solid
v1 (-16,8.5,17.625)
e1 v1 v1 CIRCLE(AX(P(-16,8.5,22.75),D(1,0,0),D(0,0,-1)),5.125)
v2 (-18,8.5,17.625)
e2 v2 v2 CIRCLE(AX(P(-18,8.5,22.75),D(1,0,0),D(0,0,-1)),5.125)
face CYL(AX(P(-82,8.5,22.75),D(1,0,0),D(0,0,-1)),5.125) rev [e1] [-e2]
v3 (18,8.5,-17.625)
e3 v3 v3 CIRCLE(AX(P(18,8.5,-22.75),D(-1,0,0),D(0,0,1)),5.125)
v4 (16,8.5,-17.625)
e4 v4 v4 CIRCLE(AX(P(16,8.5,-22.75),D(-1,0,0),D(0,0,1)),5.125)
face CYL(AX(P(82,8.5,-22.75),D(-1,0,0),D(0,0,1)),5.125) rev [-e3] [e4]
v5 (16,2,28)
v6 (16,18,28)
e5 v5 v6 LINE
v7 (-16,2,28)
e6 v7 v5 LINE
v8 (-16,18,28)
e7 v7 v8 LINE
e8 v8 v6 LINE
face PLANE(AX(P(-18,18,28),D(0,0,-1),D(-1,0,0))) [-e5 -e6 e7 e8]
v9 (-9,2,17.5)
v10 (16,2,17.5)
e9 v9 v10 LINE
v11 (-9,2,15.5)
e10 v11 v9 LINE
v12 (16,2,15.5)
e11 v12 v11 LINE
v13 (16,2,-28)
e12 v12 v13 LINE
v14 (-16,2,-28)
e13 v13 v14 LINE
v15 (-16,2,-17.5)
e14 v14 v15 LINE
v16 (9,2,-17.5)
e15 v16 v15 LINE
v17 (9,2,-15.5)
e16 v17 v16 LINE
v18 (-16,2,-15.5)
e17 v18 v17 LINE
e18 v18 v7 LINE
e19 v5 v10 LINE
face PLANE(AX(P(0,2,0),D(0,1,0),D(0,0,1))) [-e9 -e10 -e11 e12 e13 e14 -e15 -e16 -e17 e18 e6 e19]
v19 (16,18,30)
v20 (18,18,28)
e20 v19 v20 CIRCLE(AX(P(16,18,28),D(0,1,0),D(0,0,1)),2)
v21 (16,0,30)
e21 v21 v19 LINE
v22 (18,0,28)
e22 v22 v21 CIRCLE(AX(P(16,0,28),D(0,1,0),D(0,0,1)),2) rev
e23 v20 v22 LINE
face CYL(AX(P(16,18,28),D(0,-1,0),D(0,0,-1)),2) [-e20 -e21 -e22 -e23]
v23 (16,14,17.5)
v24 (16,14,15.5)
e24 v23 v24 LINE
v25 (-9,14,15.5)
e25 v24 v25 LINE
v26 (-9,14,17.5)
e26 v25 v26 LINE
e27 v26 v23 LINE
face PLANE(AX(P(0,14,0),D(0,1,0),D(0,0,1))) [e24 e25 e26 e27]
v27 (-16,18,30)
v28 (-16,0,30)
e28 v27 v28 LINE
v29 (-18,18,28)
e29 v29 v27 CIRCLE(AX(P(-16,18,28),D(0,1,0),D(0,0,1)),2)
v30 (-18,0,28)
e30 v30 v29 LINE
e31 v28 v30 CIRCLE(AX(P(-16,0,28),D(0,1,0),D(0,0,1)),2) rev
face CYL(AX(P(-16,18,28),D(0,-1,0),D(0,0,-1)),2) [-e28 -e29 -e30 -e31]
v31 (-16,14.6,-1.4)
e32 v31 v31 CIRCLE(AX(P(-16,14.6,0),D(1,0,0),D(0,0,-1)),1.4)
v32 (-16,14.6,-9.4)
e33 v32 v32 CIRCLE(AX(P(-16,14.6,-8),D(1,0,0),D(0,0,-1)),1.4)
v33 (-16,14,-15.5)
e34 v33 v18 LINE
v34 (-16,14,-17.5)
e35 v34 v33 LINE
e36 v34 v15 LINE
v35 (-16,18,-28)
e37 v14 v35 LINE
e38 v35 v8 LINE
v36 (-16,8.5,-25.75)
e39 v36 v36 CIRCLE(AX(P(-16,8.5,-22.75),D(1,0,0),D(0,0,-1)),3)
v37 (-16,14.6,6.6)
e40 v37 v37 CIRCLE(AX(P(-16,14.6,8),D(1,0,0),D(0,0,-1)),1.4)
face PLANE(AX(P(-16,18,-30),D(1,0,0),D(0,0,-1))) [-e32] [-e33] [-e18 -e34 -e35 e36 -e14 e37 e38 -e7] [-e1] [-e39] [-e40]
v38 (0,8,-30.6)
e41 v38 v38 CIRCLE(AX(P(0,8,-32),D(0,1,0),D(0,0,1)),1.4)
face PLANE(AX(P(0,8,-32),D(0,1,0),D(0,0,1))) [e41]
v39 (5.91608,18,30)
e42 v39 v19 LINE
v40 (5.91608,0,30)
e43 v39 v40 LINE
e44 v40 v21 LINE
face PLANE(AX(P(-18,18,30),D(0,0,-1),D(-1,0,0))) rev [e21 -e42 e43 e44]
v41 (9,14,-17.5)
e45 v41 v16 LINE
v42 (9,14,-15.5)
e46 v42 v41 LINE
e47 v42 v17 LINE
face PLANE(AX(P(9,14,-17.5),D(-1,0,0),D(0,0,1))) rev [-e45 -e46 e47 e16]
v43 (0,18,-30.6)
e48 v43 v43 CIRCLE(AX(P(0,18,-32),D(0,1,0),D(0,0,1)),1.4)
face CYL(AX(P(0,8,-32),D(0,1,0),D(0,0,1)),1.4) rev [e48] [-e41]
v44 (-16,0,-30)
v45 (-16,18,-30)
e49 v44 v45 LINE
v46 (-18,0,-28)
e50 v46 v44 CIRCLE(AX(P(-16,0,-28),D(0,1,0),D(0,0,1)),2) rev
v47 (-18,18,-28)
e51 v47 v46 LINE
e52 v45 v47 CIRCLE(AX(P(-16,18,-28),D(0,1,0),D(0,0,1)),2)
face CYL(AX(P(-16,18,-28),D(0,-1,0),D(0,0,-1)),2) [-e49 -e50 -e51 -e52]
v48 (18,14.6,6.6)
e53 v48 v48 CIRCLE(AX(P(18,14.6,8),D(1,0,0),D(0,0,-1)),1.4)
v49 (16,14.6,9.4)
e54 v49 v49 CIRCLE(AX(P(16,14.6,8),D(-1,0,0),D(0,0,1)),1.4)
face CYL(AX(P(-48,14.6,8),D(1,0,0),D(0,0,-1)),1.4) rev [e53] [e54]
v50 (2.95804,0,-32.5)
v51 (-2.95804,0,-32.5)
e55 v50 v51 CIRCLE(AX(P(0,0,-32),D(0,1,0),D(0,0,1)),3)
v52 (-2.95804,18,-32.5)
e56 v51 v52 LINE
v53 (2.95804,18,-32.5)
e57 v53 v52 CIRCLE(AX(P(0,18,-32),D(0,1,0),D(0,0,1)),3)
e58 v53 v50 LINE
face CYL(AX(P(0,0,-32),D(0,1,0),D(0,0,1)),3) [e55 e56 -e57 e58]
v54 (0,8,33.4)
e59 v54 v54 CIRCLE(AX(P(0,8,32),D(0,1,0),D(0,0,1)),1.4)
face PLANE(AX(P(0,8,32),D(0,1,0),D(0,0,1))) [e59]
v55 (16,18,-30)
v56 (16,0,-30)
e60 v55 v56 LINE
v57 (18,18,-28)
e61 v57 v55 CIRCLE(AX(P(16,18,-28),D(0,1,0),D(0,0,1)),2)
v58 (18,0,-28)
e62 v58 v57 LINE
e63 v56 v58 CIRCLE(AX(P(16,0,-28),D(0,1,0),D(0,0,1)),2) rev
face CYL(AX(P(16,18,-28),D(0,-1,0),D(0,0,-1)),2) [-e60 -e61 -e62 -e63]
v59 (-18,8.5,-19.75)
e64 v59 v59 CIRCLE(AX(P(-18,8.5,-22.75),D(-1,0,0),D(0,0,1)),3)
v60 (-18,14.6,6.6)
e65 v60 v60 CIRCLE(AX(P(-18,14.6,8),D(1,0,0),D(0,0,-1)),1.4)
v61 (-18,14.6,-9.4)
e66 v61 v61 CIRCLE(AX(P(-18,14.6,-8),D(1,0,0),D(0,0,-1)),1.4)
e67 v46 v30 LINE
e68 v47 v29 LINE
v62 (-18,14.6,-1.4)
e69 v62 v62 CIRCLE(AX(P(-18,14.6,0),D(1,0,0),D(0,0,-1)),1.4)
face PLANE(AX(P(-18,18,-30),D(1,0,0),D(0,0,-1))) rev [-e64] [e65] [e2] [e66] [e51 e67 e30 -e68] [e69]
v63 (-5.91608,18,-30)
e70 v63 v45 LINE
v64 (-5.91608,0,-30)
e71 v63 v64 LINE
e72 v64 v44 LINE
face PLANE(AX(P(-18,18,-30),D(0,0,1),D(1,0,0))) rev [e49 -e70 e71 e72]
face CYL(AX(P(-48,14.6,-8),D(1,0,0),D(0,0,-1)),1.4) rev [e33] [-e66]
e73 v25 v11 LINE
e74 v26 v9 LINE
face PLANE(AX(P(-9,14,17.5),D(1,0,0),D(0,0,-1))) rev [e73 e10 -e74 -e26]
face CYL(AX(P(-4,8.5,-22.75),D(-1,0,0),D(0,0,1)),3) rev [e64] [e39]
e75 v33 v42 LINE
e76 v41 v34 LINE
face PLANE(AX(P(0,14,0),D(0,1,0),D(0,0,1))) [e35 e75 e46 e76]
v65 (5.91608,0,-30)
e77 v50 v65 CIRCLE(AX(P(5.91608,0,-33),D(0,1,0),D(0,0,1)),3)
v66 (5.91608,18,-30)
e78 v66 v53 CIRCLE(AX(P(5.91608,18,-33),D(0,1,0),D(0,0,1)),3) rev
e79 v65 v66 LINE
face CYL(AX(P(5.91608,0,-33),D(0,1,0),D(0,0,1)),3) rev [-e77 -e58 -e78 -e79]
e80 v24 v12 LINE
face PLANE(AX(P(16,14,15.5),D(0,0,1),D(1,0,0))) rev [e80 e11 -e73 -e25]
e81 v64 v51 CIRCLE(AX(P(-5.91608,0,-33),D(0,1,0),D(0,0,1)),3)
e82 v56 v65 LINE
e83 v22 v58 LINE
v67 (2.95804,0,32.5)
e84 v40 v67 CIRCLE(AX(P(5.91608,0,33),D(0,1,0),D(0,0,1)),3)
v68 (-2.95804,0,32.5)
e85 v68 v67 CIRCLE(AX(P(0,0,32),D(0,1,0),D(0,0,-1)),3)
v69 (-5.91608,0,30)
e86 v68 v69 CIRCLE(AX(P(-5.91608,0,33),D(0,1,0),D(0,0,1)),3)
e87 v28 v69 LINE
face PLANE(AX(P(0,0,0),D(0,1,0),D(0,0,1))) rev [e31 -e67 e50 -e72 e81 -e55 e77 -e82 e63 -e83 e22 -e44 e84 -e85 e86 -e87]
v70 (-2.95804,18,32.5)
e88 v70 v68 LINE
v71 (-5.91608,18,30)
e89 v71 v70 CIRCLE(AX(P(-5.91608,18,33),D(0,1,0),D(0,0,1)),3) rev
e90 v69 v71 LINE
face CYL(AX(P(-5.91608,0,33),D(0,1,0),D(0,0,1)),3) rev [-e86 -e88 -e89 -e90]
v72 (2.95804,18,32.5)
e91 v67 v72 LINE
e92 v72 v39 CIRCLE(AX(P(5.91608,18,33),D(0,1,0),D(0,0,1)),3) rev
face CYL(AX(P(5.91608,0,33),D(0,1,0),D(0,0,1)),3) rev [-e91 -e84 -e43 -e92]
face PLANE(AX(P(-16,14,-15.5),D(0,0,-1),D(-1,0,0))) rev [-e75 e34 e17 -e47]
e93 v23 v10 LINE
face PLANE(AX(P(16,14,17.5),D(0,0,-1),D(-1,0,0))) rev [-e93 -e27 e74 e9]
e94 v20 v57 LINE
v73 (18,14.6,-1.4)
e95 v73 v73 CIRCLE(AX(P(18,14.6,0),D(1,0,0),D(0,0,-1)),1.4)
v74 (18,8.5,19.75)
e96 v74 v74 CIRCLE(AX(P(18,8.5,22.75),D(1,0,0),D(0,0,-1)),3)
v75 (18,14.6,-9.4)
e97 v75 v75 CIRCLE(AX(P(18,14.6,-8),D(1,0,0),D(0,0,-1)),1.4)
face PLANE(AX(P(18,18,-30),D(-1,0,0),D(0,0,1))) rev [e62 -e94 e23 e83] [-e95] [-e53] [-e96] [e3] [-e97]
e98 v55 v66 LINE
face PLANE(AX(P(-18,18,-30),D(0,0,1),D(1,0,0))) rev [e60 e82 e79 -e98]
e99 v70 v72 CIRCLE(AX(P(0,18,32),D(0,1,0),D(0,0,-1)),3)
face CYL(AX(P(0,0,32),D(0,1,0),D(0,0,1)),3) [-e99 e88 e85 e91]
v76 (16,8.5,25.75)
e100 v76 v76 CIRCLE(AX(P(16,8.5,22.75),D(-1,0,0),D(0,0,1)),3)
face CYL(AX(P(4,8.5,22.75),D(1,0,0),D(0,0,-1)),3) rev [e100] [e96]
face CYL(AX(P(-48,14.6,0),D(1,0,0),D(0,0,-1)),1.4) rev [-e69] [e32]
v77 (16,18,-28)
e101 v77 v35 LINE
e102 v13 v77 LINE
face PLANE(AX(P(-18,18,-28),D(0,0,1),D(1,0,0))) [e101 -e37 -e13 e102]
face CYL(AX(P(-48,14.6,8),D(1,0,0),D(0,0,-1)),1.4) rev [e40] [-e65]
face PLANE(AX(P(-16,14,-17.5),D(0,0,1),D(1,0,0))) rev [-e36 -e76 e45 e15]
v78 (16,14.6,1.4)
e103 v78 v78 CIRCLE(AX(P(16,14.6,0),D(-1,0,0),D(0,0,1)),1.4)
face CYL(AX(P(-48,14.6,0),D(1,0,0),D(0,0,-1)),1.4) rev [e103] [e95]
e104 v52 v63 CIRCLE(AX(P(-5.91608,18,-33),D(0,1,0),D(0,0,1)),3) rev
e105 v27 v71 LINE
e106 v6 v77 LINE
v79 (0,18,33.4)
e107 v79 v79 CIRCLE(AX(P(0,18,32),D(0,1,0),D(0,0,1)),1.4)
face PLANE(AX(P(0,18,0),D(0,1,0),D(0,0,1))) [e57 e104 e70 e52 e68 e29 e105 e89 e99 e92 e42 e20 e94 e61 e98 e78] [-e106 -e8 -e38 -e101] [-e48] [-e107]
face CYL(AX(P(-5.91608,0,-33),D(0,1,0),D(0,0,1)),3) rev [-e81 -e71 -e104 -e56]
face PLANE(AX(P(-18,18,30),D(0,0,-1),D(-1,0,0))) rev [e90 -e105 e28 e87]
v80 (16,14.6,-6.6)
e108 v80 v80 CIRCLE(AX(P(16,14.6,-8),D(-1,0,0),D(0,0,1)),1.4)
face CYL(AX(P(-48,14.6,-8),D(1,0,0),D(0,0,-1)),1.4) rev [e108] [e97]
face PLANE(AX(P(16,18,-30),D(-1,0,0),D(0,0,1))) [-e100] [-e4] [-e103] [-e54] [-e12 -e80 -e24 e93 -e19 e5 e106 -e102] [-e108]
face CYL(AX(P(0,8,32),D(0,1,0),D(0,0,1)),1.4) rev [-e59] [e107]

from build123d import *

# Parameters (mm, degrees)
SKETCH_1_W          = 36
SKETCH_1_H          = 60
EXTRUDE_1_DEPTH     = 18
FILLET_1_R          = 2
SHELL_START         = -16
SHELL_1_OUTLINE_W   = 16
SHELL_1_OUTLINE_H   = 56
SHELL_1_DEPTH       = 32
SKETCH_2_W          = 25
SKETCH_2_H          = 2
EXTRUDE_2_DEPTH     = 12
SKETCH_3_R          = 3
CUT_EXTRUDE_1_DEPTH = 14
SKETCH_4_R          = 3
EXTRUDE_3_DEPTH     = 18
FILLET_2_R          = 3
SKETCH_6_W          = 25
SKETCH_6_H          = 2
EXTRUDE_4_DEPTH     = 12
SKETCH_8_R          = 3
CUT_EXTRUDE_2_DEPTH = 14
SKETCH_9_R          = 1.4
CUT_EXTRUDE_3_DEPTH = 10
SKETCH_11_R         = 1.4
CUT_EXTRUDE_5_DEPTH = 66
SKETCH_13_R         = 5.125
CUT_EXTRUDE_6_DEPTH = 66
SKETCH_14_R         = 5.125
CUT_EXTRUDE_7_DEPTH = 66


# Read off the part's stored shape, not the designer's step: 抽壳1
with BuildPart() as part:
    # 草图1 → 凸台-拉伸1 (new body)
    with BuildSketch(Plane(origin=(0, 0, 0), x_dir=(1, 0, 0), z_dir=(0, 1, 0))):
        Rectangle(SKETCH_1_W, SKETCH_1_H)
    extrude(amount=EXTRUDE_1_DEPTH)

    # 圆角1
    fillet_1_edges = [part.edges().sort_by_distance(p)[0] for p in [
        (-18, 9, -30),
        (18, 9, -30),
        (18, 9, 30),
        (-18, 9, 30),
    ]]
    fillet(fillet_1_edges, radius=FILLET_1_R)

    # 抽壳1 outline → 抽壳1 (cut)
    with BuildSketch(Plane.YZ.offset(SHELL_START)):
        with Locations((10, 0)):
            Rectangle(SHELL_1_OUTLINE_W, SHELL_1_OUTLINE_H)
    extrude(amount=SHELL_1_DEPTH, mode=Mode.SUBTRACT)

    # 草图2 → 凸台-拉伸2 (add)
    with BuildSketch(Plane(origin=(0, 2, 0), x_dir=(1, 0, 0), z_dir=(0, 1, 0))):
        with Locations((3.5, -16.5)):
            Rectangle(SKETCH_2_W, SKETCH_2_H)
    extrude(amount=EXTRUDE_2_DEPTH)

    # 草图3 → 切除-拉伸1 (cut)
    with BuildSketch(Plane(origin=(18, 0, 0), x_dir=(0, 0, -1), z_dir=(1, 0, 0))):
        with Locations((-22.75, 8.5)):
            Circle(SKETCH_3_R)
    extrude(amount=-CUT_EXTRUDE_1_DEPTH, mode=Mode.SUBTRACT)

    # 草图4 → 凸台-拉伸3 (add)
    with BuildSketch(Plane(origin=(0, 18, 0), x_dir=(1, 0, 0), z_dir=(0, 1, 0))):
        with Locations((0, 32)):
            Circle(SKETCH_4_R)
        with Locations((0, -32)):
            Circle(SKETCH_4_R)
    extrude(amount=-EXTRUDE_3_DEPTH)

    # 圆角2
    fillet_2_edges = [part.edges().sort_by_distance(p)[0] for p in [
        (2.236067977, 9, -30),
        (-2.236067977, 9, -30),
        (-2.236067977, 9, 30),
        (2.236067977, 9, 30),
    ]]
    fillet(fillet_2_edges, radius=FILLET_2_R)

    # 草图6 → 凸台-拉伸4 (add)
    with BuildSketch(Plane(origin=(0, 2, 0), x_dir=(1, 0, 0), z_dir=(0, 1, 0))):
        with Locations((-3.5, 16.5)):
            Rectangle(SKETCH_6_W, SKETCH_6_H)
    extrude(amount=EXTRUDE_4_DEPTH)

    # 草图8 → 切除-拉伸2 (cut)
    with BuildSketch(Plane.ZY.offset(18)):
        with Locations((-22.75, 8.5)):
            Circle(SKETCH_8_R)
    extrude(amount=-CUT_EXTRUDE_2_DEPTH, mode=Mode.SUBTRACT)

    # 草图9 → 切除-拉伸3 (cut)
    with BuildSketch(Plane(origin=(0, 18, 0), x_dir=(1, 0, 0), z_dir=(0, 1, 0))):
        with Locations(Location((0, 32, 0), (0, 0, 270))):
            Circle(SKETCH_9_R)
        with Locations(Location((0, -32, 0), (0, 0, 270))):
            Circle(SKETCH_9_R)
    extrude(amount=-CUT_EXTRUDE_3_DEPTH, mode=Mode.SUBTRACT)

    # 草图11 → 切除-拉伸5 (cut)
    with BuildSketch(Plane(origin=(18, 0, 0), x_dir=(0, 0, -1), z_dir=(1, 0, 0))):
        with Locations((-8, 14.6)):
            Circle(SKETCH_11_R)
        with Locations((0, 14.6)):
            Circle(SKETCH_11_R)
        with Locations((8, 14.6)):
            Circle(SKETCH_11_R)
    extrude(amount=-CUT_EXTRUDE_5_DEPTH, mode=Mode.SUBTRACT)

    # 草图13 → 切除-拉伸6 (cut)
    with BuildSketch(Plane.ZY.offset(-16)):
        with Locations((-22.75, 8.5)):
            Circle(SKETCH_13_R)
    extrude(amount=-CUT_EXTRUDE_6_DEPTH, mode=Mode.SUBTRACT)

    # 草图14 → 切除-拉伸7 (cut)
    with BuildSketch(Plane(origin=(-16, 0, 0), x_dir=(0, 0, -1), z_dir=(1, 0, 0))):
        with Locations((-22.75, 8.5)):
            Circle(SKETCH_14_R)
    extrude(amount=-CUT_EXTRUDE_7_DEPTH, mode=Mode.SUBTRACT)


solid = part.part
